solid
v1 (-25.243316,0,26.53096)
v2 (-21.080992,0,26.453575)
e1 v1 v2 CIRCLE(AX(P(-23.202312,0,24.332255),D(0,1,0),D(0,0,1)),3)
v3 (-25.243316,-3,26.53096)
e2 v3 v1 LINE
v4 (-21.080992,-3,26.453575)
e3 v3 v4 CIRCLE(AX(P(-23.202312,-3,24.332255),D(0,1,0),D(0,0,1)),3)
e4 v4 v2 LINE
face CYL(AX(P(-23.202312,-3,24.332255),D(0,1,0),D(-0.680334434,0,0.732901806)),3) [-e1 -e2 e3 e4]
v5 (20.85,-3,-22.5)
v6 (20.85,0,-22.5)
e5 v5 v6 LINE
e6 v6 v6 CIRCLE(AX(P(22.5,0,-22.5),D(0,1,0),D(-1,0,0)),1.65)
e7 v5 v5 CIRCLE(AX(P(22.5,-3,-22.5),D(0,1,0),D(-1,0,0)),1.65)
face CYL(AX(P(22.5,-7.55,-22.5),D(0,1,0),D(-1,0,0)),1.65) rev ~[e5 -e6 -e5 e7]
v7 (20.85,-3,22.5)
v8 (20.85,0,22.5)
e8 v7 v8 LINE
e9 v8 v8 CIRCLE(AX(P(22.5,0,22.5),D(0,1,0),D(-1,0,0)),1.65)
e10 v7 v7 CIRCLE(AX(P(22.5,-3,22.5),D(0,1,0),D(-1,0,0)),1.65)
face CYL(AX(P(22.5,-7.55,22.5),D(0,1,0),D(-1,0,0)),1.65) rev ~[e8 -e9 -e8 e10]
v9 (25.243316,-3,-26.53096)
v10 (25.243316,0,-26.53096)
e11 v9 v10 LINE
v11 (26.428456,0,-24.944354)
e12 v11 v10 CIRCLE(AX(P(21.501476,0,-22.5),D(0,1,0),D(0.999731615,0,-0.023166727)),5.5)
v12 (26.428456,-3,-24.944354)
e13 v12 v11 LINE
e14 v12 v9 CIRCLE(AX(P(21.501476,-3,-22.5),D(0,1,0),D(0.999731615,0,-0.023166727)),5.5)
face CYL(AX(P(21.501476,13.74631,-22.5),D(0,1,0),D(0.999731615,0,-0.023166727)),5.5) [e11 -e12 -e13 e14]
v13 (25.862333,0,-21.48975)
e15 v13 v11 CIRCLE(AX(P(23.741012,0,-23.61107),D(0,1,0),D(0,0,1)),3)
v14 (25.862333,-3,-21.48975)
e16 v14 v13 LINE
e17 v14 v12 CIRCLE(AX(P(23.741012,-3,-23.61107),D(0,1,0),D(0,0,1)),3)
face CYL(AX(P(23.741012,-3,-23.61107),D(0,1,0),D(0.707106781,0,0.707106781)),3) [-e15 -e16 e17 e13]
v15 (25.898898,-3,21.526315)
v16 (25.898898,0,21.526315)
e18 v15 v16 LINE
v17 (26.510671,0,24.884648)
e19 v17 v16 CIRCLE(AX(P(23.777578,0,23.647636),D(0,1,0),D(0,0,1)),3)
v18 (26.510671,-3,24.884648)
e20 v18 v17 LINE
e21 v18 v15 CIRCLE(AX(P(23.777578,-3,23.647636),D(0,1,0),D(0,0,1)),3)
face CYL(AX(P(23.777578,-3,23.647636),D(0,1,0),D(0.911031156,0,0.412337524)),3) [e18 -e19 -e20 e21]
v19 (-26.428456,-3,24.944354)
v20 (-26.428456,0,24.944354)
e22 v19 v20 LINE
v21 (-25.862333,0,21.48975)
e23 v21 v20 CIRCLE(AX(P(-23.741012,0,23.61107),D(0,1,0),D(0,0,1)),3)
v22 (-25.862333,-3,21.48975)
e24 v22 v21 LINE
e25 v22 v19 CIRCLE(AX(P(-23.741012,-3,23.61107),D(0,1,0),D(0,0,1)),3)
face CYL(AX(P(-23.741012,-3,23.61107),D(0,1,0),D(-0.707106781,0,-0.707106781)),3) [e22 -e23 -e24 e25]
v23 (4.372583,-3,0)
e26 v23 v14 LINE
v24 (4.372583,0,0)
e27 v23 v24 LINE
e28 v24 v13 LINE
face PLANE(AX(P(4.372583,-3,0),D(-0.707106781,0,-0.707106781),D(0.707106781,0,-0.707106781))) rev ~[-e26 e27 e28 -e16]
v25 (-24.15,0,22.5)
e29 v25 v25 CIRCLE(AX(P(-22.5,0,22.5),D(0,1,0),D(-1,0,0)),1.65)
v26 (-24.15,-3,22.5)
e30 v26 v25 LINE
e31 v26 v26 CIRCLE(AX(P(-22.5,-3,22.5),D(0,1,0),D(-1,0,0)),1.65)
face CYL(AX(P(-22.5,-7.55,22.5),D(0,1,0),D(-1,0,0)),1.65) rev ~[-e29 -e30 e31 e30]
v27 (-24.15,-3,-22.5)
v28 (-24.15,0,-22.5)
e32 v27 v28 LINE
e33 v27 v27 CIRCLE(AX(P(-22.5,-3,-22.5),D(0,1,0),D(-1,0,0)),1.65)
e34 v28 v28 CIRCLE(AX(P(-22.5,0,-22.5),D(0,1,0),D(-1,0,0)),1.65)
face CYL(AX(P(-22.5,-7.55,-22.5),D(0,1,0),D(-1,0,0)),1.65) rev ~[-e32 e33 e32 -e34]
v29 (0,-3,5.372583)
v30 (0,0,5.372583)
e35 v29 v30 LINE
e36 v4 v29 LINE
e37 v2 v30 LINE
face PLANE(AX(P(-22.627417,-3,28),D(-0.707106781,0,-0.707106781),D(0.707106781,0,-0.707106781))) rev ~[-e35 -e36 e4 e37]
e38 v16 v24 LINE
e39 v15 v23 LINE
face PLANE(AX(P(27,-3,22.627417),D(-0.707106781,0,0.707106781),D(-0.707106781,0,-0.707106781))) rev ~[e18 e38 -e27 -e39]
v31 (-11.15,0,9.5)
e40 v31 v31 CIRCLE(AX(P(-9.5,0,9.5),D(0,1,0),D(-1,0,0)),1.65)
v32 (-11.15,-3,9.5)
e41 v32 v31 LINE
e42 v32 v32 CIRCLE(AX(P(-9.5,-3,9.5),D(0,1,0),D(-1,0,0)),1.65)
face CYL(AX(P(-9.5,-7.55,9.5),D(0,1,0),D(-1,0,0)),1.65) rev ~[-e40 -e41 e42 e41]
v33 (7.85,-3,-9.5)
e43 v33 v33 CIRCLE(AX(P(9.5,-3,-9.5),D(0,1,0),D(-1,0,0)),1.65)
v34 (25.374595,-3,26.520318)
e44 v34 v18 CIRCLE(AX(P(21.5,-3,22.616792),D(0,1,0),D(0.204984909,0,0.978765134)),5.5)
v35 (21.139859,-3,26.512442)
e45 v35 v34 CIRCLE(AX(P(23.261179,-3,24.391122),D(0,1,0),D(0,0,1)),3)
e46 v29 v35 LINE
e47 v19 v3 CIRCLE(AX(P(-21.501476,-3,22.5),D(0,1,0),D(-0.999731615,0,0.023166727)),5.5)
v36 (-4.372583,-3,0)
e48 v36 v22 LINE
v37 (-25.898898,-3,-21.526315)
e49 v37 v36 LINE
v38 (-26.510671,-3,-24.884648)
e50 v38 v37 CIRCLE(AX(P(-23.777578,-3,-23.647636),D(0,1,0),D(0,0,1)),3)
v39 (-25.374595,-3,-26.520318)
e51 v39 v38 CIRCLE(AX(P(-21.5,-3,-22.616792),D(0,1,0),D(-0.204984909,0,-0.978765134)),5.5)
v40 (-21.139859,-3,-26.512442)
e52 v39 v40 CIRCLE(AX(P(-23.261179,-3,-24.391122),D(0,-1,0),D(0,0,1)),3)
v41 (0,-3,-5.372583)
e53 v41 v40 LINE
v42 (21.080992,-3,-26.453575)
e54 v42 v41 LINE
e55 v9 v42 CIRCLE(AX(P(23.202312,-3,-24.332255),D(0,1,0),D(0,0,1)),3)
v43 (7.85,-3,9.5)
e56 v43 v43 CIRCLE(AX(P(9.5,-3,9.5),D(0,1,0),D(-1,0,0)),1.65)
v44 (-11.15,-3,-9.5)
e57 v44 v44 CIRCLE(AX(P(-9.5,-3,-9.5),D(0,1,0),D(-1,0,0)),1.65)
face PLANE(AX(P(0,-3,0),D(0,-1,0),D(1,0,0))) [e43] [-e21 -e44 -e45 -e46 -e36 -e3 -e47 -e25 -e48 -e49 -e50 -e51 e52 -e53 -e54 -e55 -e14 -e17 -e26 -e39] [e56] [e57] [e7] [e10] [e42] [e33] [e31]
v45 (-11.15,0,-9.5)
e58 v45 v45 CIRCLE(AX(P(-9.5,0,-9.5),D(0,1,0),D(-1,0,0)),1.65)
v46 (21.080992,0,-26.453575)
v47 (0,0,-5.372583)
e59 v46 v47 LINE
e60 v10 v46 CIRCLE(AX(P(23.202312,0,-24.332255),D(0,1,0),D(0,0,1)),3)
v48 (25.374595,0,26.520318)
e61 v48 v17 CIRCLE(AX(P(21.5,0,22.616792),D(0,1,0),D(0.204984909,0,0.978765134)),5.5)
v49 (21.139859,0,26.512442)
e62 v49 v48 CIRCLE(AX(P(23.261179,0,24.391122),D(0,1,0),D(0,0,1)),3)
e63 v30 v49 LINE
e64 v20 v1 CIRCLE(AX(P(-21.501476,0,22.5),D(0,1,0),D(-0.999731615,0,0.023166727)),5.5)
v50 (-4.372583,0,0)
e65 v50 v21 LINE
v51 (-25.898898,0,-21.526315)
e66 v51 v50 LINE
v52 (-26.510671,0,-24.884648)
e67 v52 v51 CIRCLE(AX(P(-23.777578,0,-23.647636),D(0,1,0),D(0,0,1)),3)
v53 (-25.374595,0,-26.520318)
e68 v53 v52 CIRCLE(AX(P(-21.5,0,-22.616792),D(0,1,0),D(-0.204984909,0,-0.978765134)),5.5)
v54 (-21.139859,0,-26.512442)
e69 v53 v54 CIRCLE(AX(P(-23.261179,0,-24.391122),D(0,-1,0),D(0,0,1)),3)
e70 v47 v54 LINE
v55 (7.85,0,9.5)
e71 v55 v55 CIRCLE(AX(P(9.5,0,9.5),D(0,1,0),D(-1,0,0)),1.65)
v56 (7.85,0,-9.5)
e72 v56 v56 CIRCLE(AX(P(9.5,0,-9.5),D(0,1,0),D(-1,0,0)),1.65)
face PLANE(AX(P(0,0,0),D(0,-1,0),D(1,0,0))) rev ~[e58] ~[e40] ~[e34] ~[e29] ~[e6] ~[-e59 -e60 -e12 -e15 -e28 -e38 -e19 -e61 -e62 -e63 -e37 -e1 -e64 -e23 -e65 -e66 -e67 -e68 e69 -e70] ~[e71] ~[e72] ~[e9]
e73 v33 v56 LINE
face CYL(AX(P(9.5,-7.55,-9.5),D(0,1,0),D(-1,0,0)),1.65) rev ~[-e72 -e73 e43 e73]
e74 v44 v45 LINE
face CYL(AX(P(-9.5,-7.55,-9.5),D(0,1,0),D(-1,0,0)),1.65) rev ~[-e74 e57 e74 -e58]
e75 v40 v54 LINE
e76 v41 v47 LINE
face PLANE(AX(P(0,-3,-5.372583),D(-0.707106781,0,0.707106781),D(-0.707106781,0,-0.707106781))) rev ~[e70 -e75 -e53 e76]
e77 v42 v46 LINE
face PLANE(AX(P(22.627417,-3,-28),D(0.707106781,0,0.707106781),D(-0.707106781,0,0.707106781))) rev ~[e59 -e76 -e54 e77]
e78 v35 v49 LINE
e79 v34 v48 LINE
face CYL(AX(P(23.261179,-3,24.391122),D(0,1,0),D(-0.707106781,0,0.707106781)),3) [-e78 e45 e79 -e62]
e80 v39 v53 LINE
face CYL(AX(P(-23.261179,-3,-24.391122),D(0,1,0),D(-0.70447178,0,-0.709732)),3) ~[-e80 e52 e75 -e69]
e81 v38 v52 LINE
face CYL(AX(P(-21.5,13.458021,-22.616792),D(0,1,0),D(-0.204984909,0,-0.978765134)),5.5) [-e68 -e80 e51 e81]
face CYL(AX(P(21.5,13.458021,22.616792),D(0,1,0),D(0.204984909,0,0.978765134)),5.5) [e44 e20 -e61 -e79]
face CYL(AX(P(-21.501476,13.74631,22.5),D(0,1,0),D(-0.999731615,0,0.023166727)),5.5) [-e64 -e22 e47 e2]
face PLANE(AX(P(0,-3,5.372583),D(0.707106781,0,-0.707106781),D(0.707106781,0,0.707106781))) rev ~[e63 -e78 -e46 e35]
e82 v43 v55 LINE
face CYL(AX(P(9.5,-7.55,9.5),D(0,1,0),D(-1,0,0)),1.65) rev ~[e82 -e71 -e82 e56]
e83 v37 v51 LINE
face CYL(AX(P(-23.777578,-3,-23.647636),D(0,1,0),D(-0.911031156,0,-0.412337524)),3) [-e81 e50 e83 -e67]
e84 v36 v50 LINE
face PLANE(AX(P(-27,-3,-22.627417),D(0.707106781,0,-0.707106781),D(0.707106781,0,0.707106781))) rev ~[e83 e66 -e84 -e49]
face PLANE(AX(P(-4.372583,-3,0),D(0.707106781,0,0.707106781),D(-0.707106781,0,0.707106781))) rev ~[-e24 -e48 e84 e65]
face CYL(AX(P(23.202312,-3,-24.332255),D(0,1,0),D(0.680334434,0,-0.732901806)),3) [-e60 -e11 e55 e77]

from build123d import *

# Parameters (mm, degrees)
F0_W        = 54
F0_H        = 56
F1_DEPTH    = 3
F3_D        = 3.3
F3_DEPTH    = 4.55
F3_TIP      = 0.9914200214
F5_DEPTH    = 3.001
F7_D        = 3.3
F7_DEPTH    = 4.55
F7_TIP      = 0.9914200214
F8_T1_DEPTH = 29.9160411803
F8_T3_DEPTH = 30.4926194226
F8_T5_DEPTH = 30.4926194226
F8_T7_DEPTH = 29.9160411803
F9_R        = 3


# Not quite as in the source:
# - a fillet or chamfer that OpenCascade refuses, or shapes differently, is made with other operations: its cross-section is extruded or revolved along the edge and cut away or added


with BuildPart() as f1:
    # F0 (on Front) → F1 (new body)
    with BuildSketch(Plane.XZ):
        Rectangle(F0_W, F0_H)
    extrude(amount=F1_DEPTH)

    # F3
    with Locations(Plane.XZ.offset(3)):
        with Locations((-22.5, 22.5), (22.5, 22.5), (22.5, -22.5), (-22.5, -22.5)):
            Hole(F3_D / 2, depth=F3_DEPTH)
            with Locations((0, 0, -(F3_DEPTH + F3_TIP / 2))):  # 118° drill point
                Cone(0, F3_D / 2, F3_TIP, mode=Mode.SUBTRACT)

    # F4 (on face) → F5 (cut, through all)
    with BuildSketch(Plane.XZ.offset(3)):
        Polygon((-4.372583002, 0), (-27, 22.627416998), (-27, -22.627416998), align=None)
        Polygon((22.627416998, 28), (-22.627416998, 28), (0, 5.372583002), align=None)
        Polygon((27, -22.627416998), (27, 22.627416998), (4.372583002, 0), align=None)
        Polygon((0, -5.372583002), (-22.627416998, -28), (22.627416998, -28), align=None)
    extrude(amount=-F5_DEPTH, mode=Mode.SUBTRACT)

    # F7
    with Locations(Plane.XZ.offset(3)):
        with Locations((-9.5, 9.5), (9.5, 9.5), (9.5, -9.5), (-9.5, -9.5)):
            Hole(F7_D / 2, depth=F7_DEPTH)
            with Locations((0, 0, -(F7_DEPTH + F7_TIP / 2))):  # 118° drill point
                Cone(0, F7_D / 2, F7_TIP, mode=Mode.SUBTRACT)

    # F8: fillet of radius 5.5 on 4 edges, made by hand

    # F8_s2 → F8_t1 (cut)
    with BuildSketch(Plane.XZ.offset(-13.4580205902)):
        with BuildLine():
            ThreePointArc((-22.627416998, -28), (-25.7691213082, -26.0844427348), (-27, -22.6167917639))
            Line((-27, -22.6167917639), (-27, -28))
            Line((-27, -28), (-22.627416998, -28))
        make_face()
    extrude(amount=F8_T1_DEPTH, mode=Mode.SUBTRACT)

    # F8_s4 → F8_t3 (cut)
    with BuildSketch(Plane.XZ.offset(-13.7463097113)):
        with BuildLine():
            ThreePointArc((-27, 22.627416998), (-25.3452507259, 26.4338780795), (-21.5014761155, 28))
            Line((-21.5014761155, 28), (-27, 28))
            Line((-27, 28), (-27, 22.627416998))
        make_face()
    extrude(amount=F8_T3_DEPTH, mode=Mode.SUBTRACT)

    # F8_s6 → F8_t5 (cut)
    with BuildSketch(Plane.XZ.offset(-13.7463097113)):
        with BuildLine():
            ThreePointArc((27, -22.627416998), (25.3452507259, -26.4338780795), (21.5014761155, -28))
            Line((21.5014761155, -28), (27, -28))
            Line((27, -28), (27, -22.627416998))
        make_face()
    extrude(amount=F8_T5_DEPTH, mode=Mode.SUBTRACT)

    # F8_s8 → F8_t7 (cut)
    with BuildSketch(Plane.XZ.offset(-13.4580205902)):
        with BuildLine():
            ThreePointArc((22.627416998, 28), (25.7691213082, 26.0844427348), (27, 22.6167917639))
            Line((27, 22.6167917639), (27, 28))
            Line((27, 28), (22.627416998, 28))
        make_face()
    extrude(amount=F8_T7_DEPTH, mode=Mode.SUBTRACT)

    # F9
    f9_edges = [f1.edges().sort_by_distance(p)[0] for p in [
        (-27, -1.5, 22.627417),
        (-26.99999, -1.5, -22.627407),
        (27, -1.5, -22.627417),
        (26.99999, -1.5, 22.627407),
        (-22.627417, -1.5, -28),
        (22.530329, -1.5, -27.902912),
        (-22.530329, -1.5, 27.902912),
        (22.627417, -1.5, 28),
    ]]
    fillet(f9_edges, radius=F9_R)


solid = f1.part
